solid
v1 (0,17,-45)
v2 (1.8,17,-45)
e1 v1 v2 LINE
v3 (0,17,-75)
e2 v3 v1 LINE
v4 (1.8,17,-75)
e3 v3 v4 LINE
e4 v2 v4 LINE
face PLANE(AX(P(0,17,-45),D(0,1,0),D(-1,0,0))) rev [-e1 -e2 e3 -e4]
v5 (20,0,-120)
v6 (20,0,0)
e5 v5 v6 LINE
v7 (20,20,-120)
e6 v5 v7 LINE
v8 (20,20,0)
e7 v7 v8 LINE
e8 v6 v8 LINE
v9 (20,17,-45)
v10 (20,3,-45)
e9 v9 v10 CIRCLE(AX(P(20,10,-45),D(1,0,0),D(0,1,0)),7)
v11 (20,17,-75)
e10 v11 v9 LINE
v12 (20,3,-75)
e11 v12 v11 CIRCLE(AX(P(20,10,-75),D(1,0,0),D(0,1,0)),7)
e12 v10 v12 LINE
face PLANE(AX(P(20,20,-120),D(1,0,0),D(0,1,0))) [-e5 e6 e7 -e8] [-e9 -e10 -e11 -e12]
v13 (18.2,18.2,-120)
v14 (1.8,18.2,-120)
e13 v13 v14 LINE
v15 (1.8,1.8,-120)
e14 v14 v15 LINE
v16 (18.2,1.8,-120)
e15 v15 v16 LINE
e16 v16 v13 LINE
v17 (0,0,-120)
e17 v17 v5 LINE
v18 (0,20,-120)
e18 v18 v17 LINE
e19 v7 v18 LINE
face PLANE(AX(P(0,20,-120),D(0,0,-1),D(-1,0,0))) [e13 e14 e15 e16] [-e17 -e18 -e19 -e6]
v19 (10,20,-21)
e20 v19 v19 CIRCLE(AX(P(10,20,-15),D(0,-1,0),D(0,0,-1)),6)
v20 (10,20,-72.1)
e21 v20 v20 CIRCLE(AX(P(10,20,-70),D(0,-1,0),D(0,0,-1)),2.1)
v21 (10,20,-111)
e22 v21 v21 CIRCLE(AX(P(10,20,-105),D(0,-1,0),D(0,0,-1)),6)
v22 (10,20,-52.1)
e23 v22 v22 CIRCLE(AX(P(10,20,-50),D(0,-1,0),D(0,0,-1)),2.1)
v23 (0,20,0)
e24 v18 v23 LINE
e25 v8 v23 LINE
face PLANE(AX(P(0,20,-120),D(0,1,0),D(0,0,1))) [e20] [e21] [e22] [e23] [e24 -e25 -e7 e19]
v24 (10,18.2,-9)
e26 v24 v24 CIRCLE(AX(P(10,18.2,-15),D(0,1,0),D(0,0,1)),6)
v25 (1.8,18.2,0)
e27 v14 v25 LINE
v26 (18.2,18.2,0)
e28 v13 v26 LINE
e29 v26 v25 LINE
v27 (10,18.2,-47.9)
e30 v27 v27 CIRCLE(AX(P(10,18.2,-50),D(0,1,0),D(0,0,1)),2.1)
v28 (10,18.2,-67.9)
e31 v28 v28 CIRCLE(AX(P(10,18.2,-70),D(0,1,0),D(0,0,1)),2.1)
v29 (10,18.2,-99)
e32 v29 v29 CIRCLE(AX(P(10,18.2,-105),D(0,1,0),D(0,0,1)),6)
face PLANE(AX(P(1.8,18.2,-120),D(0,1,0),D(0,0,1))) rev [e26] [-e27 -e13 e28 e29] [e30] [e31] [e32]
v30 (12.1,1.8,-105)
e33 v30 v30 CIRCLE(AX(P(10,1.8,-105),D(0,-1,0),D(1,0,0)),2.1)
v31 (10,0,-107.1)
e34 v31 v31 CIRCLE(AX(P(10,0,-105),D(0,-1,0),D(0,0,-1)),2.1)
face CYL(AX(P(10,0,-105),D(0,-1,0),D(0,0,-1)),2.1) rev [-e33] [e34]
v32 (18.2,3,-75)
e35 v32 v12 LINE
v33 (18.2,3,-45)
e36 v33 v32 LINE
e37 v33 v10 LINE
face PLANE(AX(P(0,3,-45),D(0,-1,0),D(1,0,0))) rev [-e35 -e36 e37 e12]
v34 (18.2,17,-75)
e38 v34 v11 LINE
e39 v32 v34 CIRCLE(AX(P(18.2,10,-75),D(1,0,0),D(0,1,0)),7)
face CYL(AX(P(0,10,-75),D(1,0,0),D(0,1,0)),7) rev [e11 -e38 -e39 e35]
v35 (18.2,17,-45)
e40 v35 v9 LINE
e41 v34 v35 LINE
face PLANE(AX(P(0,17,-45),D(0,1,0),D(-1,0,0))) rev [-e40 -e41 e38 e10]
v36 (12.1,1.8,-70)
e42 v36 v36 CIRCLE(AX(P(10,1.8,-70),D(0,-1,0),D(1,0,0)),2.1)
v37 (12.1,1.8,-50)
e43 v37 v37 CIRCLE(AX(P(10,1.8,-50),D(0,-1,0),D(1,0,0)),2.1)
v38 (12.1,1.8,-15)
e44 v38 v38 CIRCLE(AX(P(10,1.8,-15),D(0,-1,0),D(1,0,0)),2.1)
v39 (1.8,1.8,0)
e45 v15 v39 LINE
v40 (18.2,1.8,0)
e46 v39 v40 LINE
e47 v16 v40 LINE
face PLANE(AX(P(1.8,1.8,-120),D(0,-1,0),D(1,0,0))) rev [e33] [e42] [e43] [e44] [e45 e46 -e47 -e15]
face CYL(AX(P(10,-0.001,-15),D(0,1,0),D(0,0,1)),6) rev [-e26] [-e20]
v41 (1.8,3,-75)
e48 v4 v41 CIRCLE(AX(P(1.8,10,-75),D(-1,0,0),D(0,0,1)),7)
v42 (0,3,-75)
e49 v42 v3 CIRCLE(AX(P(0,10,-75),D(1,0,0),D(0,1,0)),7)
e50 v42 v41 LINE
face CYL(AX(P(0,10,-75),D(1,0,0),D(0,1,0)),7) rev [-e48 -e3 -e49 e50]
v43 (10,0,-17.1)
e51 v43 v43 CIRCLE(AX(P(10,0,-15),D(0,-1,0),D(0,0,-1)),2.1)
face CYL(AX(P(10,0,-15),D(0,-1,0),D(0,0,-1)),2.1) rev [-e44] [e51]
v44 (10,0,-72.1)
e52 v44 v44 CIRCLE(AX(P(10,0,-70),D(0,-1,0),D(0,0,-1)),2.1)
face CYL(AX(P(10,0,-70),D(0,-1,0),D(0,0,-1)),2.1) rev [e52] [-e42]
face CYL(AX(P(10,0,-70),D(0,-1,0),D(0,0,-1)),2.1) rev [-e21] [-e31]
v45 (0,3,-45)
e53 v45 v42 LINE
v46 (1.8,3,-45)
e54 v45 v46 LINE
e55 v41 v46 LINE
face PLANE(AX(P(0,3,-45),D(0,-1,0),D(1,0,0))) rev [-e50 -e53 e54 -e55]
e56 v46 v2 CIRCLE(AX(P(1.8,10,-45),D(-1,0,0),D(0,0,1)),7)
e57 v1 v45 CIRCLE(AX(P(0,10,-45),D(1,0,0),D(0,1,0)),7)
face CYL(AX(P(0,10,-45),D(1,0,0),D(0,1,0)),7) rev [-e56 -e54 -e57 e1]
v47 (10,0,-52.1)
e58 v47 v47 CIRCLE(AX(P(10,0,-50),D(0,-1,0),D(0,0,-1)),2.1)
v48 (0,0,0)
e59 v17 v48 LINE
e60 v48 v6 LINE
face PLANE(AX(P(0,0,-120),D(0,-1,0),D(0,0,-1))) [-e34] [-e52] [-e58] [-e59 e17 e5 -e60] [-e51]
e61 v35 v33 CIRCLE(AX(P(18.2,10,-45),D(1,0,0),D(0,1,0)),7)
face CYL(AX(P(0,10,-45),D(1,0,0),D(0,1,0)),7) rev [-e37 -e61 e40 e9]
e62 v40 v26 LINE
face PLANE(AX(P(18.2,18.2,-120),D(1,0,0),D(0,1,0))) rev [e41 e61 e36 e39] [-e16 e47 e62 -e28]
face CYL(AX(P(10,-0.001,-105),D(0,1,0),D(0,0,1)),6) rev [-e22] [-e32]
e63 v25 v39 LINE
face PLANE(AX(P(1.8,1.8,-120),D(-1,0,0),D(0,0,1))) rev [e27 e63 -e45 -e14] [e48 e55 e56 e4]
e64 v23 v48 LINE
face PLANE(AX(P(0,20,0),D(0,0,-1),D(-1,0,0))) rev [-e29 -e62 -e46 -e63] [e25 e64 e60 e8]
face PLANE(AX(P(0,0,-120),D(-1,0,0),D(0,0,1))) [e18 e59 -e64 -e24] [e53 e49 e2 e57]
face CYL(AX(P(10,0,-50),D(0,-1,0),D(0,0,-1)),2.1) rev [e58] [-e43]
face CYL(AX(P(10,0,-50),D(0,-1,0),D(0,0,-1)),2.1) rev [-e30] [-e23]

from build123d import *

# Parameters (mm, degrees)
SKETCH_3_W              = 20
SKETCH_3_H              = 20
SKETCH_3_W_2            = 16.4
SKETCH_3_H_2            = 16.4
EXTRUDE_1_DEPTH         = 120
HOLE_WIZARD_4_2_4_2_1_D = 4.2
CUT_EXTRUDE_START       = -20
CUT_EXTRUDE_1_DEPTH     = 20
CUT_EXTRUDE_2_REACH     = 125.288
SKETCH_8_R              = 6


# Read off the part's stored shape, not the designer's step: 切除-拉伸1
with BuildPart() as part:
    # 草图3 → 凸台-拉伸1 (new body)
    with BuildSketch(Plane.XY):
        with Locations((10, 10)):
            Rectangle(SKETCH_3_W, SKETCH_3_H)
        with Locations((10, 10)):
            Rectangle(SKETCH_3_W_2, SKETCH_3_H_2, mode=Mode.SUBTRACT)
    extrude(amount=-EXTRUDE_1_DEPTH)

    # Ø4.2 (4.2) 直径孔1 (through all)
    with Locations(Plane(origin=(10, 0, -105), x_dir=(0, 0, -1), z_dir=(0, -1, 0))):
        with Locations((0, 0), (-35, 0), (-55, 0), (-90, 0)):
            Hole(HOLE_WIZARD_4_2_4_2_1_D / 2)

    # 切除-拉伸1 outline → 切除-拉伸1 (cut)
    with BuildSketch(Plane(origin=(20, 0, 0), x_dir=(0, 0, -1), z_dir=(1, 0, 0)).offset(CUT_EXTRUDE_START)):
        with BuildLine():
            ThreePointArc((45, 17), (38, 10), (45, 3))
            Line((45, 3), (75, 3))
            ThreePointArc((75, 3), (82, 10), (75, 17))
            Line((75, 17), (45, 17))
        make_face()
    extrude(amount=CUT_EXTRUDE_1_DEPTH, mode=Mode.SUBTRACT)

    # 草图8 → 切除-拉伸2 (cut, up to next)
    with BuildSketch(Plane.XZ.offset(-20), mode=Mode.PRIVATE) as cut_extrude_2_sk1:
        with Locations(Location((10, -105, 0), (0, 0, 90))):
            Circle(SKETCH_8_R)
    cut_extrude_2_tool1 = extrude(cut_extrude_2_sk1.sketch, amount=CUT_EXTRUDE_2_REACH, mode=Mode.PRIVATE) & part.part
    # 草图8 → 切除-拉伸2 (cut, up to next)
    with BuildSketch(Plane.XZ.offset(-20), mode=Mode.PRIVATE) as cut_extrude_2_sk2:
        with Locations(Location((10, -15, 0), (0, 0, 90))):
            Circle(SKETCH_8_R)
    cut_extrude_2_tool2 = extrude(cut_extrude_2_sk2.sketch, amount=CUT_EXTRUDE_2_REACH, mode=Mode.PRIVATE) & part.part
    add(cut_extrude_2_tool1.solids().sort_by_distance((10, 20, -105))[0], mode=Mode.SUBTRACT)
    add(cut_extrude_2_tool2.solids().sort_by_distance((10, 20, -15))[0], mode=Mode.SUBTRACT)


solid = part.part
